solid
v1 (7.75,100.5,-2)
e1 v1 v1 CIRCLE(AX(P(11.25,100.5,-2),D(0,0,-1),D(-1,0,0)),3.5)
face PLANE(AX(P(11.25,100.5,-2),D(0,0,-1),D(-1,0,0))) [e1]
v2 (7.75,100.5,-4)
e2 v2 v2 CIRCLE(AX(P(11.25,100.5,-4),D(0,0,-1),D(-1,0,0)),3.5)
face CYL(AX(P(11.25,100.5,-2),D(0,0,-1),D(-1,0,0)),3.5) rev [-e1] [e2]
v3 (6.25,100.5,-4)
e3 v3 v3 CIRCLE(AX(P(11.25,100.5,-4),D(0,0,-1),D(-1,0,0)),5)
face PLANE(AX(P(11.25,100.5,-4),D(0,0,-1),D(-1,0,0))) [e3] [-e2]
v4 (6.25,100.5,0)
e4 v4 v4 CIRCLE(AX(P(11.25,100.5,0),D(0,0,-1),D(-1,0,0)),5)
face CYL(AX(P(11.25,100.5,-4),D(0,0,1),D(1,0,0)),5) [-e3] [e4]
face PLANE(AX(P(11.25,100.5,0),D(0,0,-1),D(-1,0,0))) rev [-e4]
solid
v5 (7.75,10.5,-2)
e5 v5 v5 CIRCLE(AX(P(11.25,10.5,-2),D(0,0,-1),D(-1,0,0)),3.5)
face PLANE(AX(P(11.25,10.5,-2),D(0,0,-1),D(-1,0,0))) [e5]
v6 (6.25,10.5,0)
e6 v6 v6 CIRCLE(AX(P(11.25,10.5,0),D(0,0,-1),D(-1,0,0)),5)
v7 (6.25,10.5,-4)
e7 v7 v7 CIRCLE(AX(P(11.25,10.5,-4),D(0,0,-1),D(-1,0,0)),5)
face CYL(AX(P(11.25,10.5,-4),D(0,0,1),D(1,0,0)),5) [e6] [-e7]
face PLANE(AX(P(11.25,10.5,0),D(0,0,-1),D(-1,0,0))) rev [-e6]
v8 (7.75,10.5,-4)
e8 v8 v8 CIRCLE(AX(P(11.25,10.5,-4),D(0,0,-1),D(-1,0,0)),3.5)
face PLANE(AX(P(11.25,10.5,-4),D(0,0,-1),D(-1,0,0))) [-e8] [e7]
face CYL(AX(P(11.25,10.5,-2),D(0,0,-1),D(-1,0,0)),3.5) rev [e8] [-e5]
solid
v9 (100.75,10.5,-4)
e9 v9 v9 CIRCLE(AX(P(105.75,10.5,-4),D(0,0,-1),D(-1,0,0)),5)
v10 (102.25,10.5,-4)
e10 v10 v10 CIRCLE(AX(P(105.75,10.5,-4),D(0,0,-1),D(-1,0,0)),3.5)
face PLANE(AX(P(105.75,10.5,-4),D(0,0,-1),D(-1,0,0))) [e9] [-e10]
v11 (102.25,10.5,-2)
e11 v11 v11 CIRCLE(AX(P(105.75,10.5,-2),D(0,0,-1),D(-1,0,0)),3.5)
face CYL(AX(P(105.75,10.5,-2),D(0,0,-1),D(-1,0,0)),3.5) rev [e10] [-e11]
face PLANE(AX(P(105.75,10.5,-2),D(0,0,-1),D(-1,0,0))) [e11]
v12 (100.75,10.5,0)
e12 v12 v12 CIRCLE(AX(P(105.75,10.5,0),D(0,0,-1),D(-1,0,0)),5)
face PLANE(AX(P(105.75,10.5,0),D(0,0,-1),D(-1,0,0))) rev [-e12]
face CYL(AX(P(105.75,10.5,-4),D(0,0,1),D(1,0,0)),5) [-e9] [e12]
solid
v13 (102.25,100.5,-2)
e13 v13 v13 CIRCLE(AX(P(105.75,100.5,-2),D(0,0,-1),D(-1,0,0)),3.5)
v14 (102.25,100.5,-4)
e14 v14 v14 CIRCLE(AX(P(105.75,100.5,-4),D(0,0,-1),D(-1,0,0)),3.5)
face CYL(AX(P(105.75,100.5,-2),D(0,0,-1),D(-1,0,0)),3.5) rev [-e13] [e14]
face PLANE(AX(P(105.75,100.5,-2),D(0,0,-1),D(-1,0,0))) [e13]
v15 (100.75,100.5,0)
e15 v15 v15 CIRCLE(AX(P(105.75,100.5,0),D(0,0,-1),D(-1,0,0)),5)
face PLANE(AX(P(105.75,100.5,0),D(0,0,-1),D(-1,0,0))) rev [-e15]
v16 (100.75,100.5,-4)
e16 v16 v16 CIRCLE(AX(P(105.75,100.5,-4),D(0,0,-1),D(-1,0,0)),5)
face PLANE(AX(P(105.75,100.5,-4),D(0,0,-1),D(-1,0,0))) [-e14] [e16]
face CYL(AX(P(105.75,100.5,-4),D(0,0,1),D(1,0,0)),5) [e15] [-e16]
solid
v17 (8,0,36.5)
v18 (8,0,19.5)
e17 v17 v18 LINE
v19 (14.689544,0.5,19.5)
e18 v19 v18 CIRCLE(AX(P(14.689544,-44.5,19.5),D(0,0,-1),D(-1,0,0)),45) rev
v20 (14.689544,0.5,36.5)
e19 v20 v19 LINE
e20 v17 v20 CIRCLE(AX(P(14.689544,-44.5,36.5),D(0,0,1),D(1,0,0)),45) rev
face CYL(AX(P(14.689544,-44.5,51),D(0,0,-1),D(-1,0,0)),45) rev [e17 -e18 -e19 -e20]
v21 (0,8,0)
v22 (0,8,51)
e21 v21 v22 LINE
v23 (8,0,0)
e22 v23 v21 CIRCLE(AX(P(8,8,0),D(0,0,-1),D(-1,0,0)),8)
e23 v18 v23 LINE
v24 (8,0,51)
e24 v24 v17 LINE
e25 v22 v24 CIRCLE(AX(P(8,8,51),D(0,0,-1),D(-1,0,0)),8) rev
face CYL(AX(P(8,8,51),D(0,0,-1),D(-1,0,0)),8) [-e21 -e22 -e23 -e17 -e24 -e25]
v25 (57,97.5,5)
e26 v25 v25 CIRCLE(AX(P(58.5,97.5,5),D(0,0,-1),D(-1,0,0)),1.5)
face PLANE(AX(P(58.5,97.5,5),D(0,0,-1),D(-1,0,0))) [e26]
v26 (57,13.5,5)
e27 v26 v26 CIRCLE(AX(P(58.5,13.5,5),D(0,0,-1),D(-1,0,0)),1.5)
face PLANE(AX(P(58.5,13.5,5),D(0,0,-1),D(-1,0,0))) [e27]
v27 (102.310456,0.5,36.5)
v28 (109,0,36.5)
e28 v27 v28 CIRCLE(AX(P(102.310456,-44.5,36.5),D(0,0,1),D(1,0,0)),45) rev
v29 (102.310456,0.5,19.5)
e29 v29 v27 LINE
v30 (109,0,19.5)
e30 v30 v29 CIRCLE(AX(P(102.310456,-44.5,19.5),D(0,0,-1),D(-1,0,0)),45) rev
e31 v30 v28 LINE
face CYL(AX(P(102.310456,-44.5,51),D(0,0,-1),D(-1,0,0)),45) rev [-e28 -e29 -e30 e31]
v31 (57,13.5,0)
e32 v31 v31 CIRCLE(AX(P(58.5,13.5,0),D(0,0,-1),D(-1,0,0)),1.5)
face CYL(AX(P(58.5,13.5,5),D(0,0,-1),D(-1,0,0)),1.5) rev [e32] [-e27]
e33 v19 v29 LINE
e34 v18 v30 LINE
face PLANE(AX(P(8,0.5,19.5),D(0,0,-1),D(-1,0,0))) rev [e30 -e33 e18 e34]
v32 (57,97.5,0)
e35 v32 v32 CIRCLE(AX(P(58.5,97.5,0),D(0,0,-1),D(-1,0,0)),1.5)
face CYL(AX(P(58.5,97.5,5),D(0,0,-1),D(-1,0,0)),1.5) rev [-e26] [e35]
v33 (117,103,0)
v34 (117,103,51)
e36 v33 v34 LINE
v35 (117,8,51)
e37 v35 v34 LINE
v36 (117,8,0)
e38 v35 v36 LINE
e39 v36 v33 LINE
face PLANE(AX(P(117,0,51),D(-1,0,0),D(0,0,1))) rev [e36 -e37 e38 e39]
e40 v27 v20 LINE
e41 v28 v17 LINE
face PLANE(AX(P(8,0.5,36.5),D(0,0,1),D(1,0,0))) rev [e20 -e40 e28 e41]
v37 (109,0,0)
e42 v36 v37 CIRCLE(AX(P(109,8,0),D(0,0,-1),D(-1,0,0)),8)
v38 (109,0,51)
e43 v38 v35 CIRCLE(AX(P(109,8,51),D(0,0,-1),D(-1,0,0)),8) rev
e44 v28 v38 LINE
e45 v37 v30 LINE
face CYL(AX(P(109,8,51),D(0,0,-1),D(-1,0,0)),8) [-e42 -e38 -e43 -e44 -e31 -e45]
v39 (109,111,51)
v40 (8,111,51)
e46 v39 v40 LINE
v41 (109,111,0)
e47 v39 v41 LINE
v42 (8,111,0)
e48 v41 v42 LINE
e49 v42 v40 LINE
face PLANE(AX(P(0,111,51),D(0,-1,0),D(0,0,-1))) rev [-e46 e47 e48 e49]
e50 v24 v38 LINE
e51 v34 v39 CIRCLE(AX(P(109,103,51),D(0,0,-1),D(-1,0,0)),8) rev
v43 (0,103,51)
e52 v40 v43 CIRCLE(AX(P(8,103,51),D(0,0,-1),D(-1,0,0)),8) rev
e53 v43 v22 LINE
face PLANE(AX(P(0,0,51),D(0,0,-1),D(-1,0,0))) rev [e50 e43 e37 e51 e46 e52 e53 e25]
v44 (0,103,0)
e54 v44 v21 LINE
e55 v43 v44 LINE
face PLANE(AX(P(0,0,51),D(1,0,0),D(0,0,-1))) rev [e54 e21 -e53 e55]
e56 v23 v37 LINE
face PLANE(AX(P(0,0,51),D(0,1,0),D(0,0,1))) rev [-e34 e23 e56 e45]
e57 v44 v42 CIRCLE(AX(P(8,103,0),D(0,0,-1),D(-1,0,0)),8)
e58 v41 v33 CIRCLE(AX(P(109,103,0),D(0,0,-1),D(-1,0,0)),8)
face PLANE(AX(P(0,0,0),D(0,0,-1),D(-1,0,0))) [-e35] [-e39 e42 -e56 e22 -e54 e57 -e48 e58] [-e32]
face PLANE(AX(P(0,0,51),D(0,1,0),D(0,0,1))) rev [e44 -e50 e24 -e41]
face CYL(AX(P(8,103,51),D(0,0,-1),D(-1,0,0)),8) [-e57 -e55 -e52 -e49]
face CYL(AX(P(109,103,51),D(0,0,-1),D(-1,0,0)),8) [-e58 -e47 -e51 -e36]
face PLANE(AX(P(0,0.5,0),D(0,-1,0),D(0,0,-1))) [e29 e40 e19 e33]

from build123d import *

# Parameters (mm, degrees)
SKETCH_1_W          = 117
SKETCH_1_H          = 111
EXTRUDE_1_DEPTH     = 51
FILLET_1_R          = 8
SKETCH_2_W          = 101
SKETCH_2_H          = 17
CUT_EXTRUDE_1_DEPTH = 0.5
FILLET_2_R          = 45
SKETCH_4_R          = 5
EXTRUDE_3_DEPTH     = 4
EXTRUDE_3_2_DEPTH   = 4
EXTRUDE_3_3_DEPTH   = 4
EXTRUDE_3_4_DEPTH   = 4
SKETCH_5_R          = 3.5
CUT_EXTRUDE_2_DEPTH = 2
SKETCH_6_R          = 1.5
CUT_EXTRUDE_3_DEPTH = 5


with BuildPart() as part:
    # 草图1 → 凸台-拉伸1 (new body)
    with BuildSketch(Plane.XY):
        with Locations((58.5, 55.5)):
            Rectangle(SKETCH_1_W, SKETCH_1_H)
    extrude(amount=EXTRUDE_1_DEPTH)

    # 圆角1
    fillet_1_edges = [part.edges().sort_by_distance(p)[0] for p in [
        (0, 111, 25.5),
        (117, 111, 25.5),
        (117, 0, 25.5),
        (0, 0, 25.5),
    ]]
    fillet(fillet_1_edges, radius=FILLET_1_R)

    # 草图2 → 切除-拉伸1 (cut)
    with BuildSketch(Plane.XZ):
        with Locations((58.5, 28)):
            Rectangle(SKETCH_2_W, SKETCH_2_H)
    extrude(amount=-CUT_EXTRUDE_1_DEPTH, mode=Mode.SUBTRACT)

    # 圆角2
    # the kernel refuses this fillet: 45 mm, written as the material it adds along each edge
    with BuildSketch(Plane(origin=(109, 0.5, 36.5), x_dir=(0, -1, 0), z_dir=(0, 0, -1)), Plane(origin=(8, 0.5, 2.7761398), x_dir=(0, -1, 0), z_dir=(0, 0, 1))) as fillet_2_piece_1:
        with BuildLine():
            CenterArc((45, 6.68954408), FILLET_2_R, 180, 8.549078831)
            Line((0, 6.68954408), (0, 0))
            Line((0, 0), (0.5, 0))
        make_face()
    extrude(amount=33.7238602)

    # 草图6 → 切除-拉伸3 (cut)
    with BuildSketch(Plane(origin=(0, 0, 0), x_dir=(-1, 0, 0), z_dir=(0, 0, -1))):
        with Locations((-58.5, 97.5)):
            Circle(SKETCH_6_R)
        with Locations((-58.5, 13.5)):
            Circle(SKETCH_6_R)
    extrude(amount=-CUT_EXTRUDE_3_DEPTH, mode=Mode.SUBTRACT)


with BuildPart() as body_2:
    # 草图4 → 凸台-拉伸3 (new body)
    with BuildSketch(Plane(origin=(0, 0, 0), x_dir=(-1, 0, 0), z_dir=(0, 0, -1))):
        with Locations((-105.75, 100.5)):
            Circle(SKETCH_4_R)
    extrude(amount=EXTRUDE_3_DEPTH)


with BuildPart() as body_3:
    # 草图4 → Extrude 3 2 (new body)
    with BuildSketch(Plane(origin=(0, 0, 0), x_dir=(-1, 0, 0), z_dir=(0, 0, -1))):
        with Locations((-105.75, 10.5)):
            Circle(SKETCH_4_R)
    extrude(amount=EXTRUDE_3_2_DEPTH)


with BuildPart() as body_4:
    # 草图4 → Extrude 3 3 (new body)
    with BuildSketch(Plane(origin=(0, 0, 0), x_dir=(-1, 0, 0), z_dir=(0, 0, -1))):
        with Locations((-11.25, 10.5)):
            Circle(SKETCH_4_R)
    extrude(amount=EXTRUDE_3_3_DEPTH)


with BuildPart() as body_5:
    # 草图4 → Extrude 3 4 (new body)
    with BuildSketch(Plane(origin=(0, 0, 0), x_dir=(-1, 0, 0), z_dir=(0, 0, -1))):
        with Locations((-11.25, 100.5)):
            Circle(SKETCH_4_R)
    extrude(amount=EXTRUDE_3_4_DEPTH)


with BuildPart() as cut_extrude_2_tool:
    # 草图5 → 切除-拉伸2 (new body)
    with BuildSketch(Plane(origin=(0, 0, -4), x_dir=(-1, 0, 0), z_dir=(0, 0, -1))):
        with Locations((-105.75, 100.5)):
            Circle(SKETCH_5_R)
        with Locations((-105.75, 10.5)):
            Circle(SKETCH_5_R)
        with Locations((-11.25, 10.5)):
            Circle(SKETCH_5_R)
        with Locations((-11.25, 100.5)):
            Circle(SKETCH_5_R)
    extrude(amount=-CUT_EXTRUDE_2_DEPTH)


with BuildPart() as body_2_1:
    add(body_2.part)

    # 切除-拉伸2: cut by cut_extrude_2_tool
    add(cut_extrude_2_tool.part, mode=Mode.SUBTRACT)


with BuildPart() as body_3_1:
    add(body_3.part)

    # 切除-拉伸2: cut by cut_extrude_2_tool
    add(cut_extrude_2_tool.part, mode=Mode.SUBTRACT)


with BuildPart() as body_4_1:
    add(body_4.part)

    # 切除-拉伸2: cut by cut_extrude_2_tool
    add(cut_extrude_2_tool.part, mode=Mode.SUBTRACT)


with BuildPart() as body_5_1:
    add(body_5.part)

    # 切除-拉伸2: cut by cut_extrude_2_tool
    add(cut_extrude_2_tool.part, mode=Mode.SUBTRACT)


solid = Compound([part.part, body_2_1.part, body_3_1.part, body_4_1.part, body_5_1.part])
